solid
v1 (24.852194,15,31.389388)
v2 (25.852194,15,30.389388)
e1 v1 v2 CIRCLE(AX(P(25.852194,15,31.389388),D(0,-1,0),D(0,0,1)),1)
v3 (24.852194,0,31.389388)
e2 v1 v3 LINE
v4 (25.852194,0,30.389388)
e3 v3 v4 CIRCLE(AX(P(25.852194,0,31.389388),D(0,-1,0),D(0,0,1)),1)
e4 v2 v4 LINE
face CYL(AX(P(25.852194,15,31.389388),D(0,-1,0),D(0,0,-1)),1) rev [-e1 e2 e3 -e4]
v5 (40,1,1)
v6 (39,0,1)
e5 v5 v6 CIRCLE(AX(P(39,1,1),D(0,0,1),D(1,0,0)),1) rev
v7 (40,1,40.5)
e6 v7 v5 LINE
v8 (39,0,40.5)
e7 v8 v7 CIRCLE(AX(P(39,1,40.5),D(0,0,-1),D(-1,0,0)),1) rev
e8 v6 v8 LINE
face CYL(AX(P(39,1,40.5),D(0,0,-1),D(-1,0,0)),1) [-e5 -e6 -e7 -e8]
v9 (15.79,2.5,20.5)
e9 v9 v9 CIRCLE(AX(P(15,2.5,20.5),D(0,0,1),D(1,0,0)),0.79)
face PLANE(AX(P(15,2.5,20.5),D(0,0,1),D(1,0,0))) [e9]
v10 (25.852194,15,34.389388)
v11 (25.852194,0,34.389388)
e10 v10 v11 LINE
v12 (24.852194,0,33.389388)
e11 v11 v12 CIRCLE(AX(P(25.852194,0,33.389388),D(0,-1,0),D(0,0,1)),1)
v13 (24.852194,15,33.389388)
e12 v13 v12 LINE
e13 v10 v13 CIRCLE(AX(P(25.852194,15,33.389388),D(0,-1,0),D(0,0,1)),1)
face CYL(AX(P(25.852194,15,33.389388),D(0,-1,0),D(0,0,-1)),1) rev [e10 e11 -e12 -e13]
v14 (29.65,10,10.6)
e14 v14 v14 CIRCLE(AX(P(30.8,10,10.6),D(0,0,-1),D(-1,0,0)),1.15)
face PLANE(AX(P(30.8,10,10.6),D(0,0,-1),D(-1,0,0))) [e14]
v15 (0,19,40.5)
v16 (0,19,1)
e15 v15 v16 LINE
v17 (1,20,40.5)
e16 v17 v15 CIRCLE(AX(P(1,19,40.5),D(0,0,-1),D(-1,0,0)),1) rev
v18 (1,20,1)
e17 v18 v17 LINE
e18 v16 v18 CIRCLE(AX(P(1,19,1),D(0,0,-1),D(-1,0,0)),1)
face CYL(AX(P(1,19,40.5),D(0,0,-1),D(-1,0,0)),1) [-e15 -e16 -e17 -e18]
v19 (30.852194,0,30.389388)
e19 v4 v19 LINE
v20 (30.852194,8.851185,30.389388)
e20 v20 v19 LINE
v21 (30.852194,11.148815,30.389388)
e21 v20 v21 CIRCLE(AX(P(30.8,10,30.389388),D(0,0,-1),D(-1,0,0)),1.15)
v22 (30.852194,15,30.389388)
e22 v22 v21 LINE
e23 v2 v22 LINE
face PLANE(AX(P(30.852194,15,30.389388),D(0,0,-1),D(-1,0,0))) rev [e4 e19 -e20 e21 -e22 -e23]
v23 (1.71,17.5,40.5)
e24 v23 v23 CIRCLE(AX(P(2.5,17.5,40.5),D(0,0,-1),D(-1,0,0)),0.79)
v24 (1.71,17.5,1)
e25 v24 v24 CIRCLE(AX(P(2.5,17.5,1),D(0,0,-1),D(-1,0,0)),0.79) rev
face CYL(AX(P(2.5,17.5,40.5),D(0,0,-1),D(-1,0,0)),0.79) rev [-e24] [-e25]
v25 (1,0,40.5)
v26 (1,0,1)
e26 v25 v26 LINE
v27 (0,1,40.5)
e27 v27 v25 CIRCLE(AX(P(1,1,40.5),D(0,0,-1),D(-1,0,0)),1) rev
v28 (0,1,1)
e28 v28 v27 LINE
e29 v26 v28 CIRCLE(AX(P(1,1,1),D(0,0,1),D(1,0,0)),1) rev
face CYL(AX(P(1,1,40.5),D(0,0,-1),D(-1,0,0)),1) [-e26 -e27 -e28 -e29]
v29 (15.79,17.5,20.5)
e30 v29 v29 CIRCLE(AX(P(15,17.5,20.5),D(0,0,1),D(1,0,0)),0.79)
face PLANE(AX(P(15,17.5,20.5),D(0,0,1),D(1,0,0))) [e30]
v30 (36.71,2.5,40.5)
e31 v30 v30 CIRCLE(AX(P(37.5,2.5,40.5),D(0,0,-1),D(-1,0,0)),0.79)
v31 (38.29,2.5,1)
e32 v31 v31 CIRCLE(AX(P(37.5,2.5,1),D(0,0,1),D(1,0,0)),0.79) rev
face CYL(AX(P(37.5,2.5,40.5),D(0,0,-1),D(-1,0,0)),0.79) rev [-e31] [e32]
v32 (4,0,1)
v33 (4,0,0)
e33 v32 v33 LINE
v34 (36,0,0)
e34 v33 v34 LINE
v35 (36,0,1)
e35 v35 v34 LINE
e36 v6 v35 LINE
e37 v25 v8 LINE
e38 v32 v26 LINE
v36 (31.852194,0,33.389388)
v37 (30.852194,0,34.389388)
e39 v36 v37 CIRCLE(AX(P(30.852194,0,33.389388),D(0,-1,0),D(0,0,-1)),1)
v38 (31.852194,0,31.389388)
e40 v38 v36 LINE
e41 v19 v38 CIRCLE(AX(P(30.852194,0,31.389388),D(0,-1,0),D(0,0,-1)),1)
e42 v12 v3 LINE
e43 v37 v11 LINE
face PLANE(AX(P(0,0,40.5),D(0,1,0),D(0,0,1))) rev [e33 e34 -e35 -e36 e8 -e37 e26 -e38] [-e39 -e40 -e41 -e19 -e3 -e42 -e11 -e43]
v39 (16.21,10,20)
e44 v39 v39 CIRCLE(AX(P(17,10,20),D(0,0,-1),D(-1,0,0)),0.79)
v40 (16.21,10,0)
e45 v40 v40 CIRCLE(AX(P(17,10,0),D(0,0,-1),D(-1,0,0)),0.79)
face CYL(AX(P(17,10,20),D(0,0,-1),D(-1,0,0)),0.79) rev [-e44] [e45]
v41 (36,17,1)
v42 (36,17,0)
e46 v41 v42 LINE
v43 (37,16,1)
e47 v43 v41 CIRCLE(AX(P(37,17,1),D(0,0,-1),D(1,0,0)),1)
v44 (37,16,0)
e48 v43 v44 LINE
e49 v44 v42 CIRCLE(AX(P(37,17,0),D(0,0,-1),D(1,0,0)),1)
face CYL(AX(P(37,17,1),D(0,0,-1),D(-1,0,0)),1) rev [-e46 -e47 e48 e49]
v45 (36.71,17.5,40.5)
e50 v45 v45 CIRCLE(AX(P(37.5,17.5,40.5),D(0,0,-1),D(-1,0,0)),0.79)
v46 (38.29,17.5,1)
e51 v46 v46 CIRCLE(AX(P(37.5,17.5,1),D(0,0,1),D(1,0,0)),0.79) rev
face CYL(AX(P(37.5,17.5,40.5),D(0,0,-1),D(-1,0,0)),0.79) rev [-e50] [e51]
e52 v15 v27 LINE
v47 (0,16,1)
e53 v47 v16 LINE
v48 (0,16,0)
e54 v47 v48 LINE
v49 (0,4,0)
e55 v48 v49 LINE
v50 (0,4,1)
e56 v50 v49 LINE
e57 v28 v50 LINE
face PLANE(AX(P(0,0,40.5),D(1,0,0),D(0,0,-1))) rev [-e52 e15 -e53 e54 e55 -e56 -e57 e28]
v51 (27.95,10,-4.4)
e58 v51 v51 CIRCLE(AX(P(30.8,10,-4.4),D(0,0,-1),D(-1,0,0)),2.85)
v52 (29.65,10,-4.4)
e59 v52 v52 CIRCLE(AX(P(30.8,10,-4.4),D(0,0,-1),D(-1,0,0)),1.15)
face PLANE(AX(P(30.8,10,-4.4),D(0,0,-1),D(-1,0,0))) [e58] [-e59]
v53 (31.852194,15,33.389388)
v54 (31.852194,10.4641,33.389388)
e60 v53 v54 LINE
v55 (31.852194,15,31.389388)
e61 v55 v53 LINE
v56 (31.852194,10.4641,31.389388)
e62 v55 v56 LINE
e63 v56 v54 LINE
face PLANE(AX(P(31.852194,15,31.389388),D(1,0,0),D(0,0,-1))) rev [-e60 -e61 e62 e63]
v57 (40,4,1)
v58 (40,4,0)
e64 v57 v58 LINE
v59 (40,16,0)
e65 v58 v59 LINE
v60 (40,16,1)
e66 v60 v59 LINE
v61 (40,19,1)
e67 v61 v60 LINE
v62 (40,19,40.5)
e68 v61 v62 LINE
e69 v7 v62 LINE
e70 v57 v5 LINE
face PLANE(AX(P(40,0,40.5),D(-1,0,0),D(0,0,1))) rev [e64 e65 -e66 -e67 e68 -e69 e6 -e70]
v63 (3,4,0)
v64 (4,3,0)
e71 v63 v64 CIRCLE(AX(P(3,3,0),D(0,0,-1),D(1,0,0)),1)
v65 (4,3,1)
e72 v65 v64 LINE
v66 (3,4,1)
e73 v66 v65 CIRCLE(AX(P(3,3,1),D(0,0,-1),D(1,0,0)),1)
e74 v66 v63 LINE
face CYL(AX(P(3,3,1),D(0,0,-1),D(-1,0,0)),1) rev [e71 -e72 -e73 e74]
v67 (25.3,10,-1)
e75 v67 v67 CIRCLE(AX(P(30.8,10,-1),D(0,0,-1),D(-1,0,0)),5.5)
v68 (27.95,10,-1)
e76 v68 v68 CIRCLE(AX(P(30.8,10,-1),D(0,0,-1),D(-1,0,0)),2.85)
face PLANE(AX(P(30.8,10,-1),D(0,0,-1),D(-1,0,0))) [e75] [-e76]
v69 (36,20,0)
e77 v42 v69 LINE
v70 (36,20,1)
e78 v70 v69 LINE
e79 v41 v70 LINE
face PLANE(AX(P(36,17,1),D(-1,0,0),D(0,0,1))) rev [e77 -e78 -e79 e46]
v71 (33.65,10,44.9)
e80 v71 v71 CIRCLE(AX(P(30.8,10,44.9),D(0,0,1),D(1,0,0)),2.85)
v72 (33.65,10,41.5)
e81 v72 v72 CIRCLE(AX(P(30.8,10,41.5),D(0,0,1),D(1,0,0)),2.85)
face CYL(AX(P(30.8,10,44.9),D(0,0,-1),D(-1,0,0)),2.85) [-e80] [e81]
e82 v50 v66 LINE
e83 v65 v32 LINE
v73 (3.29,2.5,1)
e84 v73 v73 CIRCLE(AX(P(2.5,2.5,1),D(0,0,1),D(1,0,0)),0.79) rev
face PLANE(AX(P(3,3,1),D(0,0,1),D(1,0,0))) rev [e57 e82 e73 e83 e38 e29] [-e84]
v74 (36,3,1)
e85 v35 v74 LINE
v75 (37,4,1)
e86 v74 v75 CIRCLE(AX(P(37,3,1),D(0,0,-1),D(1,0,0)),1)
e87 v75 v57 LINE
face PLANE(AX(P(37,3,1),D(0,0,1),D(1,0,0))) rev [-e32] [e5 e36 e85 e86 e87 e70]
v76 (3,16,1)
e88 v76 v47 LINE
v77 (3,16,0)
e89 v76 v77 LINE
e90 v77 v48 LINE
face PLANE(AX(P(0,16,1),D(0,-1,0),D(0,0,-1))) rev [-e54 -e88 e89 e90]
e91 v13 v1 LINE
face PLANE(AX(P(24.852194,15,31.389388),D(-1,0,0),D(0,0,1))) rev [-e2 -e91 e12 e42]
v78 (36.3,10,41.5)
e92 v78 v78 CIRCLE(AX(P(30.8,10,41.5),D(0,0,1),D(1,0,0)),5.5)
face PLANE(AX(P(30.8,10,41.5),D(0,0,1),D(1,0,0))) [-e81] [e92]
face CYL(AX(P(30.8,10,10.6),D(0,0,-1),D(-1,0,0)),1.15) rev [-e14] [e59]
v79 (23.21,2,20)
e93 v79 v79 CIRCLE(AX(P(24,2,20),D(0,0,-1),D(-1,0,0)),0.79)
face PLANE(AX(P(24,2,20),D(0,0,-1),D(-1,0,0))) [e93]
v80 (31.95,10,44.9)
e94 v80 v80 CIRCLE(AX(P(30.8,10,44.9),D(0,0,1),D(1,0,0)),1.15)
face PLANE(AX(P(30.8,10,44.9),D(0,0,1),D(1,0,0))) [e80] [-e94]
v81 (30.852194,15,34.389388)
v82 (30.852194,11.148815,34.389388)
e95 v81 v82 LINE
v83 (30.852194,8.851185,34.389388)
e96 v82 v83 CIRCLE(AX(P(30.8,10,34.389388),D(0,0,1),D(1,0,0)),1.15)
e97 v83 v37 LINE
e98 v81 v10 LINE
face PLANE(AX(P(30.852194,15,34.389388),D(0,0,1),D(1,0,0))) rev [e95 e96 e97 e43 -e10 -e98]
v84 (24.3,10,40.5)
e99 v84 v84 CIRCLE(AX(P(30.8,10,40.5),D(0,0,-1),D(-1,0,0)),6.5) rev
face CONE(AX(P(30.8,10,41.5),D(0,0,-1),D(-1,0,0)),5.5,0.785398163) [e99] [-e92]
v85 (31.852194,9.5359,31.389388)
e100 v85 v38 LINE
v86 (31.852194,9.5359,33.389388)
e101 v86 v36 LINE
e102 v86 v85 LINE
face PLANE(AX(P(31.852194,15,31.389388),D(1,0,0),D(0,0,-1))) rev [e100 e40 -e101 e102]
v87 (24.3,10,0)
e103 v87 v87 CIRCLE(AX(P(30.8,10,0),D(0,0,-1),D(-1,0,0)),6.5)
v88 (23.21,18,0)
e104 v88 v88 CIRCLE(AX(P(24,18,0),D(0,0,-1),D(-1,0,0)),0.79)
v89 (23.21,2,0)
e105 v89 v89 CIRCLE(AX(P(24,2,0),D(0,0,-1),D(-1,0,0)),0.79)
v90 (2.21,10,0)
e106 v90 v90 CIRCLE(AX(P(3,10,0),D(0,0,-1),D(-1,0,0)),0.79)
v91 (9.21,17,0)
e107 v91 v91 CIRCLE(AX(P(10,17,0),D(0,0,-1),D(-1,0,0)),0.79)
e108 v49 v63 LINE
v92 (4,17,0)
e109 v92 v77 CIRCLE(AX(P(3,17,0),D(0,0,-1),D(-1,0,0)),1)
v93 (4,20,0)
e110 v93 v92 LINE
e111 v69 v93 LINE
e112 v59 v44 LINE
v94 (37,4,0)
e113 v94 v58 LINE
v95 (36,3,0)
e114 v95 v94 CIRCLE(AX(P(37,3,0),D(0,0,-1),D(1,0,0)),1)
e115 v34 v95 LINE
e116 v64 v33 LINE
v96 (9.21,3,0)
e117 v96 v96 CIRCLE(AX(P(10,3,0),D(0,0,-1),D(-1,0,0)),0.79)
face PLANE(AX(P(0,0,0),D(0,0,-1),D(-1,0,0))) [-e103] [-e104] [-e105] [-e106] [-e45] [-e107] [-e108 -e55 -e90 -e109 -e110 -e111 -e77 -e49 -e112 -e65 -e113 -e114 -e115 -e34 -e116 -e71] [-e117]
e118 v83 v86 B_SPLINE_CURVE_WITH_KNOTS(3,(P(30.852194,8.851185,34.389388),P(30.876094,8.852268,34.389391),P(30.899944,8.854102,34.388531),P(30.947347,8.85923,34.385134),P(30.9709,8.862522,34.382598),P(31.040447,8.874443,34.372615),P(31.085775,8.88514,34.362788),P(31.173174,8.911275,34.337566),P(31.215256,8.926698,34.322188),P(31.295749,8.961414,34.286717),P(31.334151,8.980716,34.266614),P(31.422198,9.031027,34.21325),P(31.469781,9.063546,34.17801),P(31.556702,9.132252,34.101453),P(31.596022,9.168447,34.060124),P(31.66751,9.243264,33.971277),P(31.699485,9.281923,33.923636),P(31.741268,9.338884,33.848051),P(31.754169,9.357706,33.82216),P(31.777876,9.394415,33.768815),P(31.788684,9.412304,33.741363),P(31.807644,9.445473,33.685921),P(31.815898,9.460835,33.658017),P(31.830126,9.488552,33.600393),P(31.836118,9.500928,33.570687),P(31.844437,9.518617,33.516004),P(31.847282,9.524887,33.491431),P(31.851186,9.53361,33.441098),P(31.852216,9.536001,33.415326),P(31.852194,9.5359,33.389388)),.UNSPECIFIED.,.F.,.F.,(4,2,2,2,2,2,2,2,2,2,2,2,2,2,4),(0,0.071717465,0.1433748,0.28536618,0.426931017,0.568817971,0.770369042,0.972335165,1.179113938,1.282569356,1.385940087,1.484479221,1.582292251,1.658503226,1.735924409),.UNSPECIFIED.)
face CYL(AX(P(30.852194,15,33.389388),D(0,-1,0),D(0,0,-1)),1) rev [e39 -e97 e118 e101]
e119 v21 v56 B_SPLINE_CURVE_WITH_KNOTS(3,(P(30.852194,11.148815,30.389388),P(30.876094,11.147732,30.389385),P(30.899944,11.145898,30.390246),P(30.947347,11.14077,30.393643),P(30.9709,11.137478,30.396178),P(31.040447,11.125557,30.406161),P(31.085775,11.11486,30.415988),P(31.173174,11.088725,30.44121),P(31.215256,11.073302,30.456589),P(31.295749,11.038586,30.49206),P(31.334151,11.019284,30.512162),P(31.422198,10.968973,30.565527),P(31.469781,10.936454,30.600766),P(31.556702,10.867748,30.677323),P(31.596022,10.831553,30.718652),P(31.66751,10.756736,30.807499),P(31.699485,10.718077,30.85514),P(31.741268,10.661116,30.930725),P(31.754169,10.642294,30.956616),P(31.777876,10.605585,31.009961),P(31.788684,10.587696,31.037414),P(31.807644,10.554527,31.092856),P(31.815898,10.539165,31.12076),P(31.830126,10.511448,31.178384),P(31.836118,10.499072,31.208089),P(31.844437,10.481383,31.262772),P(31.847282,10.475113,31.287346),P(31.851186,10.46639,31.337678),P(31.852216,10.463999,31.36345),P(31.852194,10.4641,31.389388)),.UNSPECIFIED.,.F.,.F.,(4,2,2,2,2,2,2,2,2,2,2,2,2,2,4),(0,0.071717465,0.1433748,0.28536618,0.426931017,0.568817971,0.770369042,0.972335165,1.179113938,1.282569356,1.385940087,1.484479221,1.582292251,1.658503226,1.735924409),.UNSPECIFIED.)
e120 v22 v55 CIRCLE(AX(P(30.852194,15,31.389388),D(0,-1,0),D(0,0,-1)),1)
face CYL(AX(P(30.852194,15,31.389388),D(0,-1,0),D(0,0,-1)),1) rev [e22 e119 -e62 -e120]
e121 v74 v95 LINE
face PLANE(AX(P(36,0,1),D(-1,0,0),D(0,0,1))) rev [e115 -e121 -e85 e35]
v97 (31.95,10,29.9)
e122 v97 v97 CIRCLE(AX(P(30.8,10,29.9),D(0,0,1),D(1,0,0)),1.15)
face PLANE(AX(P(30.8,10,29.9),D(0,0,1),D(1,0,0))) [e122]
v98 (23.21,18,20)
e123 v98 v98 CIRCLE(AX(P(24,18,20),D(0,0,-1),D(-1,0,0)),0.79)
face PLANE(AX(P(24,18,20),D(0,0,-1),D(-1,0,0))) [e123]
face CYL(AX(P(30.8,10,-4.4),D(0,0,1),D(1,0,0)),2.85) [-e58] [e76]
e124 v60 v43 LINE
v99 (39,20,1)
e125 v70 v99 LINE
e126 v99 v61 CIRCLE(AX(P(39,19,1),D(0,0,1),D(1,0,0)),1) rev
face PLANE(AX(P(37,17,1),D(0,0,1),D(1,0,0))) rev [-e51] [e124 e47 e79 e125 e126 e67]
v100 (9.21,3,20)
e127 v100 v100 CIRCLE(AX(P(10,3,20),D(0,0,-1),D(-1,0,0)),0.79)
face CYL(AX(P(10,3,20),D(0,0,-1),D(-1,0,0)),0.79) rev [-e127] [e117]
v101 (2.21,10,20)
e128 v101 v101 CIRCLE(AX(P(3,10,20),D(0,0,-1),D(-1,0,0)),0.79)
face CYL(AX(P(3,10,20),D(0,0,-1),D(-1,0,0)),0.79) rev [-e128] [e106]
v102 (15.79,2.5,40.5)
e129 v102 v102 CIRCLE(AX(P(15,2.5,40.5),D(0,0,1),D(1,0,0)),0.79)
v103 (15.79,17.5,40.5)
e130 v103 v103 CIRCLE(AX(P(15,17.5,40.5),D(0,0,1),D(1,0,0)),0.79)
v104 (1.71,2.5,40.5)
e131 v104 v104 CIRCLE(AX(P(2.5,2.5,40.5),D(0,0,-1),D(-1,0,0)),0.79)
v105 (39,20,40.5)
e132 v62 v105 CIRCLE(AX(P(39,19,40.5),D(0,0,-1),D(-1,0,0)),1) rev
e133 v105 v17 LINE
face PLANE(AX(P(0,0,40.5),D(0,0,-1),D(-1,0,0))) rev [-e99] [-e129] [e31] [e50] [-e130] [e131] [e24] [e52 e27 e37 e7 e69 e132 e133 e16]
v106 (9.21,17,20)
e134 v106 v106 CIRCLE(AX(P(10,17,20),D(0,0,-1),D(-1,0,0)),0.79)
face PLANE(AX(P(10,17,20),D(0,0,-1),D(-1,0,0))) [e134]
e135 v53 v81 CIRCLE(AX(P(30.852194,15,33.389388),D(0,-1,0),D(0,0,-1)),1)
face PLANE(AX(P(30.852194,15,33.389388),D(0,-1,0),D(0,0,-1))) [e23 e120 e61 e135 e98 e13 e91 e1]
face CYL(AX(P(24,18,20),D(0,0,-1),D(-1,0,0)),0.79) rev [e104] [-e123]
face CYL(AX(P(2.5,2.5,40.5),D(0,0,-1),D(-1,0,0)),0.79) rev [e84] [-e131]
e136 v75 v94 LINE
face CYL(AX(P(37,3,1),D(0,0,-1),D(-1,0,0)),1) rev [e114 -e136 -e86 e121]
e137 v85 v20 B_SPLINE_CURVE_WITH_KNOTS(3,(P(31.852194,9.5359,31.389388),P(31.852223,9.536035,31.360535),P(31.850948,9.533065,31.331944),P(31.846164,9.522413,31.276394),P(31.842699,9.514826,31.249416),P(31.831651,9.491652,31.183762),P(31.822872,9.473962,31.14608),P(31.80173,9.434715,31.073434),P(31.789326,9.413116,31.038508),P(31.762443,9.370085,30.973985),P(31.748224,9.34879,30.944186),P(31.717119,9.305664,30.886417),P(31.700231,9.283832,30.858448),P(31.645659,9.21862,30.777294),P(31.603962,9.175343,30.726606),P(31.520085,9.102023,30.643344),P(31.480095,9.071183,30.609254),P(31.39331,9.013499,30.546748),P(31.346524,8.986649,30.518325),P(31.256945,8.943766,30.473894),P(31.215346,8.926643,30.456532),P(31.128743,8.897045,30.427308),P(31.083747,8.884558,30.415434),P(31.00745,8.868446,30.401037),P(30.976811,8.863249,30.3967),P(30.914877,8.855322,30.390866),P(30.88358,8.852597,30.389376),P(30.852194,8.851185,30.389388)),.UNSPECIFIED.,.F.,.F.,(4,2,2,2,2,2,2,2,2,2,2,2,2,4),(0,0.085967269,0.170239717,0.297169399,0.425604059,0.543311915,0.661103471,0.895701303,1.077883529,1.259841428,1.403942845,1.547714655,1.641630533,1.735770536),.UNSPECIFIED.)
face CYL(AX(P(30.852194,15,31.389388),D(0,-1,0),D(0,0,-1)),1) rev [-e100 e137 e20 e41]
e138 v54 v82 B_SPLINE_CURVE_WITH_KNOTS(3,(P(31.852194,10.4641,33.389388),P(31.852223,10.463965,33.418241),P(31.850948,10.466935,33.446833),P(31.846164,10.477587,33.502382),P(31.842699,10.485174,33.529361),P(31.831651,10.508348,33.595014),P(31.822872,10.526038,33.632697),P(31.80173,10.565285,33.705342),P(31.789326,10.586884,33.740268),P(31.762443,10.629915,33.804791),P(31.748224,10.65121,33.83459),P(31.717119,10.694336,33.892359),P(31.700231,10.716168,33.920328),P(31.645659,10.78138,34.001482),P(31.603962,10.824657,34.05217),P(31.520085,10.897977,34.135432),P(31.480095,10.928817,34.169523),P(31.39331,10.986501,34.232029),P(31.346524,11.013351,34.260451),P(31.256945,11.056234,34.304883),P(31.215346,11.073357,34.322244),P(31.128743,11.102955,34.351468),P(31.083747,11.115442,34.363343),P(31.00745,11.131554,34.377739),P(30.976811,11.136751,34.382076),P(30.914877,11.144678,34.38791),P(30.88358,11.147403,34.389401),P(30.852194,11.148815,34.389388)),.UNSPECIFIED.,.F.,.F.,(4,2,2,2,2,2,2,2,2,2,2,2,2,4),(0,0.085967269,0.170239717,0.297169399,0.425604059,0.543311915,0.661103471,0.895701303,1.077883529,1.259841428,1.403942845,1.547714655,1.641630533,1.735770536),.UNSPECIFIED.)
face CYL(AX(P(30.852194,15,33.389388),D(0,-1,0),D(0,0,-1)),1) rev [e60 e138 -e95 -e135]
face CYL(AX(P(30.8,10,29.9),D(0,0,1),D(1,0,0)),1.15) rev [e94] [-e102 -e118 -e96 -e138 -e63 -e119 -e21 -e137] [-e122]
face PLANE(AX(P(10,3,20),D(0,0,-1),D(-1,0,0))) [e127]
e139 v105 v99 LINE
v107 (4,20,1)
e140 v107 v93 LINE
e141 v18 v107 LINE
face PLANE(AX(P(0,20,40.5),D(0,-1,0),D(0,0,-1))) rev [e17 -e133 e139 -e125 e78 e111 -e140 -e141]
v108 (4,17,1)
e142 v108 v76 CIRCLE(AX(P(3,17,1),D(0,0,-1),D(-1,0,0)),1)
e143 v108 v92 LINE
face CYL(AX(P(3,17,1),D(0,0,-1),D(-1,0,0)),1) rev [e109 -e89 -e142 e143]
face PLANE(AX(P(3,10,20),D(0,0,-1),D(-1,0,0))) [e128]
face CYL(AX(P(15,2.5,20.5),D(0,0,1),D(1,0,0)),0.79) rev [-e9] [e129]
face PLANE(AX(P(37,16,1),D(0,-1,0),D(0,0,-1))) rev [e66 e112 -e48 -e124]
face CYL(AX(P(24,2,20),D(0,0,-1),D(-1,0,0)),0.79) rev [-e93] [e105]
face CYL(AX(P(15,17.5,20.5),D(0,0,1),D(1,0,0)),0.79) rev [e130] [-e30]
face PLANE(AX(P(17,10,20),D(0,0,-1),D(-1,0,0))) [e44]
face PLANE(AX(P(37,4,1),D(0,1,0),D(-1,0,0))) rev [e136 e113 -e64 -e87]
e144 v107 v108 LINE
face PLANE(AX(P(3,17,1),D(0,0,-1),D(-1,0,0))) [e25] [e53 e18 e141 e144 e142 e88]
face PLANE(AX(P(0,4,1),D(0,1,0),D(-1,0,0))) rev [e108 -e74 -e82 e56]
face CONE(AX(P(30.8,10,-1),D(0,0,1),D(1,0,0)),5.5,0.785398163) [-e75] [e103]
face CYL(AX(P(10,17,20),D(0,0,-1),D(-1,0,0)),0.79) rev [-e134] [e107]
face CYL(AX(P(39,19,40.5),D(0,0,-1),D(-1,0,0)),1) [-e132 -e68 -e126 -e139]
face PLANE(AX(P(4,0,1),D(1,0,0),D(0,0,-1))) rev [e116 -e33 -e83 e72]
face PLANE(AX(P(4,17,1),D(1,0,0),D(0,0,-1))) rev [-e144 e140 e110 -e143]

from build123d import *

# Parameters (mm, degrees)
ESQUISSE1_W             = 40
ESQUISSE1_H             = 20
BOSS_EXTRU_1_DEPTH      = 40.5
ESQUISSE2_R             = 0.79
ENL_V_MAT_EXTRU_2_DEPTH = 61.334484335
ENL_V_MAT_EXTRU_3_DEPTH = 1
ESQUISSE4_R             = 0.79
ENL_V_MAT_EXTRU_4_DEPTH = 20
ESQUISSE5_R             = 6.5
BOSS_EXTRU_2_DEPTH      = 1
CHANFREIN1_SIZE         = 1
ESQUISSE6_R             = 2.85
BOSS_EXTRU_3_DEPTH      = 3.4
CONG_1_R                = 1
BOSS_EXTRU_4_START      = 1
ESQUISSE7_R             = 6.5
BOSS_EXTRU_4_DEPTH      = 1
CHANFREIN2_SIZE         = 1
BOSS_EXTRU_5_START      = 3.4
ESQUISSE8_R             = 2.85
BOSS_EXTRU_5_DEPTH      = 3.4
ENL_V_MAT_EXTRU_6_DEPTH = 15
ESQUISSE10_R            = 0.79
ENL_V_MAT_EXTRU_7_DEPTH = 20
ESQUISSE11_R            = 1.15
ENL_V_MAT_EXTRU_8_DEPTH = 15
ENL_V_START             = -15
ESQUISSE12_R            = 1.15
ENL_V_MAT_EXTRU_9_DEPTH = 15


with BuildPart() as part:
    # Esquisse1 → Boss.-Extru.1 (new body)
    with BuildSketch(Plane.XY):
        with Locations((20, 10)):
            Rectangle(ESQUISSE1_W, ESQUISSE1_H)
    extrude(amount=BOSS_EXTRU_1_DEPTH)

    # Esquisse2 → Enlèv. mat.-Extru.2 (cut, through all)
    with BuildSketch(Plane(origin=(0, 0, 0), x_dir=(-1, 0, 0), z_dir=(0, 0, -1))):
        with Locations((-2.5, 2.5)):
            Circle(ESQUISSE2_R)
        with Locations((-37.5, 2.5)):
            Circle(ESQUISSE2_R)
        with Locations((-2.5, 17.5)):
            Circle(ESQUISSE2_R)
        with Locations((-37.5, 17.5)):
            Circle(ESQUISSE2_R)
    extrude(amount=-ENL_V_MAT_EXTRU_2_DEPTH, mode=Mode.SUBTRACT)

    # Esquisse3 → Enlèv. mat.-Extru.3 (cut)
    with BuildSketch(Plane(origin=(0, 0, 0), x_dir=(-1, 0, 0), z_dir=(0, 0, -1))):
        with BuildLine():
            Line((0, 16), (-3, 16))
            ThreePointArc((-3, 16), (-3.707106781, 16.292893219), (-4, 17))
            Line((-4, 17), (-4, 20))
            Line((-4, 20), (0, 20))
            Line((0, 20), (0, 16))
        make_face()
        with BuildLine():
            Line((0, 0), (-4, 0))
            Line((-4, 0), (-4, 3))
            ThreePointArc((-4, 3), (-3.707106781, 3.707106781), (-3, 4))
            Line((-3, 4), (0, 4))
            Line((0, 4), (0, 0))
        make_face()
        with BuildLine():
            Line((-36, 0), (-40, 0))
            Line((-40, 0), (-40, 4))
            Line((-40, 4), (-37, 4))
            ThreePointArc((-37, 4), (-36.292893219, 3.707106781), (-36, 3))
            Line((-36, 3), (-36, 0))
        make_face()
        with BuildLine():
            Line((-37, 16), (-40, 16))
            Line((-40, 16), (-40, 20))
            Line((-40, 20), (-36, 20))
            Line((-36, 20), (-36, 17))
            ThreePointArc((-36, 17), (-36.292893219, 16.292893219), (-37, 16))
        make_face()
    extrude(amount=-ENL_V_MAT_EXTRU_3_DEPTH, mode=Mode.SUBTRACT)

    # Esquisse4 → Enlèv. mat.-Extru.4 (cut)
    with BuildSketch(Plane(origin=(0, 0, 0), x_dir=(-1, 0, 0), z_dir=(0, 0, -1))):
        with Locations((-3, 10)):
            Circle(ESQUISSE4_R)
        with Locations((-10, 17)):
            Circle(ESQUISSE4_R)
        with Locations((-10, 3)):
            Circle(ESQUISSE4_R)
        with Locations((-17, 10)):
            Circle(ESQUISSE4_R)
        with Locations((-24, 2)):
            Circle(ESQUISSE4_R)
        with Locations((-24, 18)):
            Circle(ESQUISSE4_R)
    extrude(amount=-ENL_V_MAT_EXTRU_4_DEPTH, mode=Mode.SUBTRACT)

    # Esquisse5 → Boss.-Extru.2 (add)
    with BuildSketch(Plane(origin=(0, 0, 0), x_dir=(-1, 0, 0), z_dir=(0, 0, -1))):
        with Locations((-30.8, 10)):
            Circle(ESQUISSE5_R)
    extrude(amount=BOSS_EXTRU_2_DEPTH)

    # Chanfrein1
    chanfrein1_edges = [part.edges().sort_by_distance(p)[0] for p in [
        (37.3, 10, -1),
    ]]
    chamfer(chanfrein1_edges, length=CHANFREIN1_SIZE - 0.0001)  # a hair under: the kernel refuses the full size

    # Esquisse6 → Boss.-Extru.3 (add)
    with BuildSketch(Plane(origin=(0, 0, -1), x_dir=(-1, 0, 0), z_dir=(0, 0, -1))):
        with Locations((-30.8, 10)):
            Circle(ESQUISSE6_R)
    extrude(amount=BOSS_EXTRU_3_DEPTH)

    # Congé1
    cong_1_edges = [part.edges().sort_by_distance(p)[0] for p in [
        (0, 20, 20.75),
        (40, 20, 20.75),
        (40, 0, 20.75),
        (0, 0, 20.75),
    ]]
    fillet(cong_1_edges, radius=CONG_1_R)

    # Esquisse7 → Boss.-Extru.4 (add)
    with BuildSketch(Plane.XY.offset(40.5).offset(BOSS_EXTRU_4_START)):
        with Locations(Location((30.8, 10, 0), (0, 0, 180))):
            Circle(ESQUISSE7_R)
    extrude(amount=-BOSS_EXTRU_4_DEPTH)

    # Chanfrein2
    chanfrein2_edges = [part.edges().sort_by_distance(p)[0] for p in [
        (37.3, 10, 41.5),
    ]]
    chamfer(chanfrein2_edges, length=CHANFREIN2_SIZE - 0.0001)  # a hair under: the kernel refuses the full size

    # Esquisse8 → Boss.-Extru.5 (add)
    with BuildSketch(Plane.XY.offset(41.5).offset(BOSS_EXTRU_5_START)):
        with Locations(Location((30.8, 10, 0), (0, 0, 180))):
            Circle(ESQUISSE8_R)
    extrude(amount=-BOSS_EXTRU_5_DEPTH)

    # Esquisse9 → Enlèv. mat.-Extru.6 (cut)
    with BuildSketch(Plane.XZ):
        with BuildLine():
            Line((30.852193658, 30.389388186), (25.852193658, 30.389388186))
            ThreePointArc((25.852193658, 30.389388186), (25.145086877, 30.682281405), (24.852193658, 31.389388186))
            Line((24.852193658, 31.389388186), (24.852193658, 33.389388186))
            ThreePointArc((24.852193658, 33.389388186), (25.145086877, 34.096494967), (25.852193658, 34.389388186))
            Line((25.852193658, 34.389388186), (30.852193658, 34.389388186))
            ThreePointArc((30.852193658, 34.389388186), (31.559300439, 34.096494967), (31.852193658, 33.389388186))
            Line((31.852193658, 33.389388186), (31.852193658, 31.389388186))
            ThreePointArc((31.852193658, 31.389388186), (31.559300439, 30.682281405), (30.852193658, 30.389388186))
        make_face()
    extrude(amount=-ENL_V_MAT_EXTRU_6_DEPTH, mode=Mode.SUBTRACT)

    # Esquisse10 → Enlèv. mat.-Extru.7 (cut)
    with BuildSketch(Plane.XY.offset(40.5)):
        with Locations((15, 2.5)):
            Circle(ESQUISSE10_R)
        with Locations((15, 17.5)):
            Circle(ESQUISSE10_R)
    extrude(amount=-ENL_V_MAT_EXTRU_7_DEPTH, mode=Mode.SUBTRACT)

    # Esquisse11 → Enlèv. mat.-Extru.8 (cut)
    with BuildSketch(Plane.XY.offset(44.9)):
        with Locations((30.8, 10)):
            Circle(ESQUISSE11_R)
    extrude(amount=-ENL_V_MAT_EXTRU_8_DEPTH, mode=Mode.SUBTRACT)

    # Esquisse12 → Enlèv. mat.-Extru.9 (cut)
    with BuildSketch(Plane(origin=(0, 0, -4.4), x_dir=(-1, 0, 0), z_dir=(0, 0, -1)).offset(ENL_V_START)):
        with Locations(Location((-30.8, 10, 0), (0, 0, 180))):
            Circle(ESQUISSE12_R)
    extrude(amount=ENL_V_MAT_EXTRU_9_DEPTH, mode=Mode.SUBTRACT)


solid = part.part
